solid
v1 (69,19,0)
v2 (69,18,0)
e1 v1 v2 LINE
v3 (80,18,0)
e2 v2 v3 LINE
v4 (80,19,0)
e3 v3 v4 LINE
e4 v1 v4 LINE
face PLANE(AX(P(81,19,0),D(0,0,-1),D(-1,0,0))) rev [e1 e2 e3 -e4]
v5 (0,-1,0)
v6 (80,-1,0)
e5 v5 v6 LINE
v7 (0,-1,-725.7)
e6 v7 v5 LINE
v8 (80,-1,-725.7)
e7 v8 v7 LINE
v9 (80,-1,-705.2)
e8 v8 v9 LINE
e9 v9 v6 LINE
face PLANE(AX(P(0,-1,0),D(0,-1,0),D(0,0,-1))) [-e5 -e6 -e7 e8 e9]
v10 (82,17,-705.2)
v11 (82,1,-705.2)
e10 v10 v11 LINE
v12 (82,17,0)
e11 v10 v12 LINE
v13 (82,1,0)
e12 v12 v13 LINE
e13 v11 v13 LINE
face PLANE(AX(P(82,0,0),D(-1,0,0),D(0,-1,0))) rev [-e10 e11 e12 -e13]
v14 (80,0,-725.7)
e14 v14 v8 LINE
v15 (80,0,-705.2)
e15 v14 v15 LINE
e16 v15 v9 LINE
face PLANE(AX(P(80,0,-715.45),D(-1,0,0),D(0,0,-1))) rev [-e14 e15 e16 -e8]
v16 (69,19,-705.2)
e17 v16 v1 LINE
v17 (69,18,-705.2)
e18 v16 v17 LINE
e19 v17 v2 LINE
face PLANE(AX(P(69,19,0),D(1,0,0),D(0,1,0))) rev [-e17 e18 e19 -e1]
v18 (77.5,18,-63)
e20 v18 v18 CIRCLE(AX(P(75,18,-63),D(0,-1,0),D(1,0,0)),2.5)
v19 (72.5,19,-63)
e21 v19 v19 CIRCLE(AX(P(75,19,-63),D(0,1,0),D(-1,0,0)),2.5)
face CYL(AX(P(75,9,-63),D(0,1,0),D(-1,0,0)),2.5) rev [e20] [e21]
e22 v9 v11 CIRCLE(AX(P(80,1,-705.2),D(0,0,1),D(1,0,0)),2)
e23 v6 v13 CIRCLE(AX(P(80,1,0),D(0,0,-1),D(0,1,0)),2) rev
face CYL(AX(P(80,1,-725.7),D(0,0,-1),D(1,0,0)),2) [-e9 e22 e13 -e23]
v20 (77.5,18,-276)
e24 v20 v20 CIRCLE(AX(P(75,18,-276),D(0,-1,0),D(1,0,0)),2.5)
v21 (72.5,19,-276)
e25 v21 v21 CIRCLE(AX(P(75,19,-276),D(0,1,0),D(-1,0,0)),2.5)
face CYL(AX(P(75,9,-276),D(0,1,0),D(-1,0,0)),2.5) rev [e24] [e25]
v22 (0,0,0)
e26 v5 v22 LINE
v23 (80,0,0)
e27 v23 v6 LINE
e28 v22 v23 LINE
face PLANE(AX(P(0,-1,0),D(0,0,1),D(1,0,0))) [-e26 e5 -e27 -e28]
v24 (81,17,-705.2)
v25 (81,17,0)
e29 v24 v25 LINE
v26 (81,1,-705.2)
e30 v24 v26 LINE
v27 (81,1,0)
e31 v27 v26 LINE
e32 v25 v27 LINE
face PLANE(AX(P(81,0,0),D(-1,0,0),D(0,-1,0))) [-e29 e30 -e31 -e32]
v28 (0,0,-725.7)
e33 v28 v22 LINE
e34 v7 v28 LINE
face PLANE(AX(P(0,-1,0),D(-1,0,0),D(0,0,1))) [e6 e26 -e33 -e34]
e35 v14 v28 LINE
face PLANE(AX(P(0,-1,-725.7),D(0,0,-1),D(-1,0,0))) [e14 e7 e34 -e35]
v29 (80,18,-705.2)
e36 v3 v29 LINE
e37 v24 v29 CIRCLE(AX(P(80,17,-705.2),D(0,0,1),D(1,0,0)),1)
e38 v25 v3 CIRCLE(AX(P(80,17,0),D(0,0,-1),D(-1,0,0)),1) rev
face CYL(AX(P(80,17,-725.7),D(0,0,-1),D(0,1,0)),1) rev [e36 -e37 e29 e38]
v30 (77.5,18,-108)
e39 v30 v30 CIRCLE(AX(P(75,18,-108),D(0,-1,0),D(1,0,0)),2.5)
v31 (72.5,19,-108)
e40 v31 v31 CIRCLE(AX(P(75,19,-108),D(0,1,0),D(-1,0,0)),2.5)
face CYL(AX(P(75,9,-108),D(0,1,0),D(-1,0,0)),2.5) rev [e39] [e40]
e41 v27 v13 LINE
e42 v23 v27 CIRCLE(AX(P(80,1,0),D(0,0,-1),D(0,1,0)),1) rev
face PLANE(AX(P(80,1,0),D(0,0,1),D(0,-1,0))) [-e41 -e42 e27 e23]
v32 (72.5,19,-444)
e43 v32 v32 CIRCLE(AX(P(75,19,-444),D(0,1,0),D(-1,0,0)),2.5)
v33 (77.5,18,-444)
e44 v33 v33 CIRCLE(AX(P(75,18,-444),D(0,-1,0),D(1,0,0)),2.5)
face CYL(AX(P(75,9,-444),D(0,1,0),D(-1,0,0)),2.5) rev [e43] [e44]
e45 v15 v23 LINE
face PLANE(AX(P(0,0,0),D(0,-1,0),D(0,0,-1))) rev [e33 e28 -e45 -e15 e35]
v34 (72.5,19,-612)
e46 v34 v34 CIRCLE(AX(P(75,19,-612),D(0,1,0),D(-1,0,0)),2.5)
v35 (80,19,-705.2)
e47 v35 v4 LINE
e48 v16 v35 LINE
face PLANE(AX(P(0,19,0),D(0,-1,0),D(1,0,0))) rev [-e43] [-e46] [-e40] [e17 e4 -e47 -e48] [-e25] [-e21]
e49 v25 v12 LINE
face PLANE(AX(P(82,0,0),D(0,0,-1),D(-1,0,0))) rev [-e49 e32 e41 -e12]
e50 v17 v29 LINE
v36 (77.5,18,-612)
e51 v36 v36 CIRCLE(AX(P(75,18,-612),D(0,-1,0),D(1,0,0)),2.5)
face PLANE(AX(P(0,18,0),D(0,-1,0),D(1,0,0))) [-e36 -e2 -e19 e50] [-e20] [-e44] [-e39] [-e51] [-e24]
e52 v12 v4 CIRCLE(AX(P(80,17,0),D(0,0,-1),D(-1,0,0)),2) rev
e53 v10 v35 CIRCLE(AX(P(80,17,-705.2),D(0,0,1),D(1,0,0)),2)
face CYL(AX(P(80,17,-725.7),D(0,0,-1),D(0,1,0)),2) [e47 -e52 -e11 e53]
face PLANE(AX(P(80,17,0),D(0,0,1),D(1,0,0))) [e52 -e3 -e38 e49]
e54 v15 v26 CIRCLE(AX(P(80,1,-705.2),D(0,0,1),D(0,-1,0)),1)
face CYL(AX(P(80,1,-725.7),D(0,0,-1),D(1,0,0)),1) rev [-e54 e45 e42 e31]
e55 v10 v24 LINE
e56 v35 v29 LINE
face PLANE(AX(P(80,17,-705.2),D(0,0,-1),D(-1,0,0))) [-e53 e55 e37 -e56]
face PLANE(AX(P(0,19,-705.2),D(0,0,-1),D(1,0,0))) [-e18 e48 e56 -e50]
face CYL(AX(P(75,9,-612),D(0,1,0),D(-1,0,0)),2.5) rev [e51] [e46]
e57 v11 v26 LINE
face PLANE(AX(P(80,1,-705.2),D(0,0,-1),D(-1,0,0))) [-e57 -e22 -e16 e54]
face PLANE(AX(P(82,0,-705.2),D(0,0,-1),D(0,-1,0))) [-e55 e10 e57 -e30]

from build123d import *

# Parameters (mm, degrees)
SKETCH1_W                    = 82
SKETCH1_H                    = 725.7
BASE_FLANGE1_DEPTH           = 1
EDGE_FLANGE1_STRIP_W         = 6
EDGE_FLANGE1_STRIP_H         = 1
EDGE_FLANGE1_STRIP_CUT_DEPTH = 725.7
EDGE_FLANGE1_DEPTH           = 725.7
EDGE_FLANGE2_STRIP_W         = 6
EDGE_FLANGE2_STRIP_H         = 1
EDGE_FLANGE2_STRIP_CUT_DEPTH = 725.7
EDGE_FLANGE2_DEPTH           = 725.7
SKETCH19_R                   = 2.5
CUT_EXTRUDE2_DEPTH           = 10
CUT_EXTRUDE3_START           = -725.7
CUT_EXTRUDE3_DEPTH           = 20.5


# Read off the part's stored shape, not the designer's step: Cut-Extrude3
# Sheet-metal steps are written as plain solids
with BuildPart() as part:
    # Sketch1 → Base-Flange1 (new body)
    with BuildSketch(Plane(origin=(0, 0, 0), x_dir=(1, 0, 0), z_dir=(0, 1, 0))):
        with Locations((41, 362.85)):
            Rectangle(SKETCH1_W, SKETCH1_H)
    extrude(amount=-BASE_FLANGE1_DEPTH)

    # Edge-Flange1 strip (across the edge) → Edge-Flange1 strip cut (cut)
    with BuildSketch(Plane(origin=(82, 0, 0), x_dir=(-1, 0, 0), z_dir=(0, 0, -1))):
        with Locations((-1, -0.5)):
            Rectangle(EDGE_FLANGE1_STRIP_W, EDGE_FLANGE1_STRIP_H)
    extrude(amount=EDGE_FLANGE1_STRIP_CUT_DEPTH, mode=Mode.SUBTRACT)

    # Edge-Flange1 section (across the edge) → Edge-Flange1 (add)
    with BuildSketch(Plane(origin=(82, 0, 0), x_dir=(-1, 0, 0), z_dir=(0, 0, -1))):
        with BuildLine():
            Line((0, 1), (0, 19))
            Line((0, 19), (1, 19))
            Line((1, 19), (1, 1))
            ThreePointArc((1, 1), (1.292893219, 0.292893219), (2, 0))
            Line((2, 0), (2, -1))
            ThreePointArc((2, -1), (0.585786438, -0.414213562), (0, 1))
        make_face()
    extrude(amount=EDGE_FLANGE1_DEPTH)

    # Edge-Flange2 strip (across the edge) → Edge-Flange2 strip cut (cut)
    with BuildSketch(Plane(origin=(81, 19, 0), x_dir=(0, -1, 0), z_dir=(0, 0, -1))):
        with Locations((-1, -0.5)):
            Rectangle(EDGE_FLANGE2_STRIP_W, EDGE_FLANGE2_STRIP_H)
    extrude(amount=EDGE_FLANGE2_STRIP_CUT_DEPTH, mode=Mode.SUBTRACT)

    # Edge-Flange2 section (across the edge) → Edge-Flange2 (add)
    with BuildSketch(Plane(origin=(81, 19, 0), x_dir=(0, -1, 0), z_dir=(0, 0, -1))):
        with BuildLine():
            Line((0, 1), (0, 12))
            Line((0, 12), (1, 12))
            Line((1, 12), (1, 1))
            ThreePointArc((1, 1), (1.292893219, 0.292893219), (2, 0))
            Line((2, 0), (2, -1))
            ThreePointArc((2, -1), (0.585786438, -0.414213562), (0, 1))
        make_face()
    extrude(amount=EDGE_FLANGE2_DEPTH)

    # Sketch19 → Cut-Extrude2 (cut)
    with BuildSketch(Plane(origin=(0, 19, 0), x_dir=(1, 0, 0), z_dir=(0, 1, 0))):
        with Locations(Location((75, 63, 0), (0, 0, 180))):
            Circle(SKETCH19_R)
        with Locations(Location((75, 108, 0), (0, 0, 180))):
            Circle(SKETCH19_R)
        with Locations(Location((75, 276, 0), (0, 0, 180))):
            Circle(SKETCH19_R)
        with Locations(Location((75, 444, 0), (0, 0, 180))):
            Circle(SKETCH19_R)
        with Locations(Location((75, 612, 0), (0, 0, 180))):
            Circle(SKETCH19_R)
        with Locations((75, 780)):
            Circle(SKETCH19_R)
    extrude(amount=-CUT_EXTRUDE2_DEPTH, mode=Mode.SUBTRACT)

    # Cut-Extrude3 outline → Cut-Extrude3 (cut)
    with BuildSketch(Plane.XY.offset(CUT_EXTRUDE3_START)):
        with BuildLine():
            ThreePointArc((81, 1), (80.707106781, 0.292893219), (80, 0))
            Line((80, 0), (80, -1))
            ThreePointArc((80, -1), (81.414213562, -0.414213562), (82, 1))
            Line((82, 1), (82, 17))
            ThreePointArc((82, 17), (81.414213562, 18.414213562), (80, 19))
            Line((80, 19), (69, 19))
            Line((69, 19), (69, 18))
            Line((69, 18), (80, 18))
            ThreePointArc((80, 18), (80.707106781, 17.707106781), (81, 17))
            Line((81, 17), (81, 1))
        make_face()
    extrude(amount=CUT_EXTRUDE3_DEPTH, mode=Mode.SUBTRACT)


solid = part.part
